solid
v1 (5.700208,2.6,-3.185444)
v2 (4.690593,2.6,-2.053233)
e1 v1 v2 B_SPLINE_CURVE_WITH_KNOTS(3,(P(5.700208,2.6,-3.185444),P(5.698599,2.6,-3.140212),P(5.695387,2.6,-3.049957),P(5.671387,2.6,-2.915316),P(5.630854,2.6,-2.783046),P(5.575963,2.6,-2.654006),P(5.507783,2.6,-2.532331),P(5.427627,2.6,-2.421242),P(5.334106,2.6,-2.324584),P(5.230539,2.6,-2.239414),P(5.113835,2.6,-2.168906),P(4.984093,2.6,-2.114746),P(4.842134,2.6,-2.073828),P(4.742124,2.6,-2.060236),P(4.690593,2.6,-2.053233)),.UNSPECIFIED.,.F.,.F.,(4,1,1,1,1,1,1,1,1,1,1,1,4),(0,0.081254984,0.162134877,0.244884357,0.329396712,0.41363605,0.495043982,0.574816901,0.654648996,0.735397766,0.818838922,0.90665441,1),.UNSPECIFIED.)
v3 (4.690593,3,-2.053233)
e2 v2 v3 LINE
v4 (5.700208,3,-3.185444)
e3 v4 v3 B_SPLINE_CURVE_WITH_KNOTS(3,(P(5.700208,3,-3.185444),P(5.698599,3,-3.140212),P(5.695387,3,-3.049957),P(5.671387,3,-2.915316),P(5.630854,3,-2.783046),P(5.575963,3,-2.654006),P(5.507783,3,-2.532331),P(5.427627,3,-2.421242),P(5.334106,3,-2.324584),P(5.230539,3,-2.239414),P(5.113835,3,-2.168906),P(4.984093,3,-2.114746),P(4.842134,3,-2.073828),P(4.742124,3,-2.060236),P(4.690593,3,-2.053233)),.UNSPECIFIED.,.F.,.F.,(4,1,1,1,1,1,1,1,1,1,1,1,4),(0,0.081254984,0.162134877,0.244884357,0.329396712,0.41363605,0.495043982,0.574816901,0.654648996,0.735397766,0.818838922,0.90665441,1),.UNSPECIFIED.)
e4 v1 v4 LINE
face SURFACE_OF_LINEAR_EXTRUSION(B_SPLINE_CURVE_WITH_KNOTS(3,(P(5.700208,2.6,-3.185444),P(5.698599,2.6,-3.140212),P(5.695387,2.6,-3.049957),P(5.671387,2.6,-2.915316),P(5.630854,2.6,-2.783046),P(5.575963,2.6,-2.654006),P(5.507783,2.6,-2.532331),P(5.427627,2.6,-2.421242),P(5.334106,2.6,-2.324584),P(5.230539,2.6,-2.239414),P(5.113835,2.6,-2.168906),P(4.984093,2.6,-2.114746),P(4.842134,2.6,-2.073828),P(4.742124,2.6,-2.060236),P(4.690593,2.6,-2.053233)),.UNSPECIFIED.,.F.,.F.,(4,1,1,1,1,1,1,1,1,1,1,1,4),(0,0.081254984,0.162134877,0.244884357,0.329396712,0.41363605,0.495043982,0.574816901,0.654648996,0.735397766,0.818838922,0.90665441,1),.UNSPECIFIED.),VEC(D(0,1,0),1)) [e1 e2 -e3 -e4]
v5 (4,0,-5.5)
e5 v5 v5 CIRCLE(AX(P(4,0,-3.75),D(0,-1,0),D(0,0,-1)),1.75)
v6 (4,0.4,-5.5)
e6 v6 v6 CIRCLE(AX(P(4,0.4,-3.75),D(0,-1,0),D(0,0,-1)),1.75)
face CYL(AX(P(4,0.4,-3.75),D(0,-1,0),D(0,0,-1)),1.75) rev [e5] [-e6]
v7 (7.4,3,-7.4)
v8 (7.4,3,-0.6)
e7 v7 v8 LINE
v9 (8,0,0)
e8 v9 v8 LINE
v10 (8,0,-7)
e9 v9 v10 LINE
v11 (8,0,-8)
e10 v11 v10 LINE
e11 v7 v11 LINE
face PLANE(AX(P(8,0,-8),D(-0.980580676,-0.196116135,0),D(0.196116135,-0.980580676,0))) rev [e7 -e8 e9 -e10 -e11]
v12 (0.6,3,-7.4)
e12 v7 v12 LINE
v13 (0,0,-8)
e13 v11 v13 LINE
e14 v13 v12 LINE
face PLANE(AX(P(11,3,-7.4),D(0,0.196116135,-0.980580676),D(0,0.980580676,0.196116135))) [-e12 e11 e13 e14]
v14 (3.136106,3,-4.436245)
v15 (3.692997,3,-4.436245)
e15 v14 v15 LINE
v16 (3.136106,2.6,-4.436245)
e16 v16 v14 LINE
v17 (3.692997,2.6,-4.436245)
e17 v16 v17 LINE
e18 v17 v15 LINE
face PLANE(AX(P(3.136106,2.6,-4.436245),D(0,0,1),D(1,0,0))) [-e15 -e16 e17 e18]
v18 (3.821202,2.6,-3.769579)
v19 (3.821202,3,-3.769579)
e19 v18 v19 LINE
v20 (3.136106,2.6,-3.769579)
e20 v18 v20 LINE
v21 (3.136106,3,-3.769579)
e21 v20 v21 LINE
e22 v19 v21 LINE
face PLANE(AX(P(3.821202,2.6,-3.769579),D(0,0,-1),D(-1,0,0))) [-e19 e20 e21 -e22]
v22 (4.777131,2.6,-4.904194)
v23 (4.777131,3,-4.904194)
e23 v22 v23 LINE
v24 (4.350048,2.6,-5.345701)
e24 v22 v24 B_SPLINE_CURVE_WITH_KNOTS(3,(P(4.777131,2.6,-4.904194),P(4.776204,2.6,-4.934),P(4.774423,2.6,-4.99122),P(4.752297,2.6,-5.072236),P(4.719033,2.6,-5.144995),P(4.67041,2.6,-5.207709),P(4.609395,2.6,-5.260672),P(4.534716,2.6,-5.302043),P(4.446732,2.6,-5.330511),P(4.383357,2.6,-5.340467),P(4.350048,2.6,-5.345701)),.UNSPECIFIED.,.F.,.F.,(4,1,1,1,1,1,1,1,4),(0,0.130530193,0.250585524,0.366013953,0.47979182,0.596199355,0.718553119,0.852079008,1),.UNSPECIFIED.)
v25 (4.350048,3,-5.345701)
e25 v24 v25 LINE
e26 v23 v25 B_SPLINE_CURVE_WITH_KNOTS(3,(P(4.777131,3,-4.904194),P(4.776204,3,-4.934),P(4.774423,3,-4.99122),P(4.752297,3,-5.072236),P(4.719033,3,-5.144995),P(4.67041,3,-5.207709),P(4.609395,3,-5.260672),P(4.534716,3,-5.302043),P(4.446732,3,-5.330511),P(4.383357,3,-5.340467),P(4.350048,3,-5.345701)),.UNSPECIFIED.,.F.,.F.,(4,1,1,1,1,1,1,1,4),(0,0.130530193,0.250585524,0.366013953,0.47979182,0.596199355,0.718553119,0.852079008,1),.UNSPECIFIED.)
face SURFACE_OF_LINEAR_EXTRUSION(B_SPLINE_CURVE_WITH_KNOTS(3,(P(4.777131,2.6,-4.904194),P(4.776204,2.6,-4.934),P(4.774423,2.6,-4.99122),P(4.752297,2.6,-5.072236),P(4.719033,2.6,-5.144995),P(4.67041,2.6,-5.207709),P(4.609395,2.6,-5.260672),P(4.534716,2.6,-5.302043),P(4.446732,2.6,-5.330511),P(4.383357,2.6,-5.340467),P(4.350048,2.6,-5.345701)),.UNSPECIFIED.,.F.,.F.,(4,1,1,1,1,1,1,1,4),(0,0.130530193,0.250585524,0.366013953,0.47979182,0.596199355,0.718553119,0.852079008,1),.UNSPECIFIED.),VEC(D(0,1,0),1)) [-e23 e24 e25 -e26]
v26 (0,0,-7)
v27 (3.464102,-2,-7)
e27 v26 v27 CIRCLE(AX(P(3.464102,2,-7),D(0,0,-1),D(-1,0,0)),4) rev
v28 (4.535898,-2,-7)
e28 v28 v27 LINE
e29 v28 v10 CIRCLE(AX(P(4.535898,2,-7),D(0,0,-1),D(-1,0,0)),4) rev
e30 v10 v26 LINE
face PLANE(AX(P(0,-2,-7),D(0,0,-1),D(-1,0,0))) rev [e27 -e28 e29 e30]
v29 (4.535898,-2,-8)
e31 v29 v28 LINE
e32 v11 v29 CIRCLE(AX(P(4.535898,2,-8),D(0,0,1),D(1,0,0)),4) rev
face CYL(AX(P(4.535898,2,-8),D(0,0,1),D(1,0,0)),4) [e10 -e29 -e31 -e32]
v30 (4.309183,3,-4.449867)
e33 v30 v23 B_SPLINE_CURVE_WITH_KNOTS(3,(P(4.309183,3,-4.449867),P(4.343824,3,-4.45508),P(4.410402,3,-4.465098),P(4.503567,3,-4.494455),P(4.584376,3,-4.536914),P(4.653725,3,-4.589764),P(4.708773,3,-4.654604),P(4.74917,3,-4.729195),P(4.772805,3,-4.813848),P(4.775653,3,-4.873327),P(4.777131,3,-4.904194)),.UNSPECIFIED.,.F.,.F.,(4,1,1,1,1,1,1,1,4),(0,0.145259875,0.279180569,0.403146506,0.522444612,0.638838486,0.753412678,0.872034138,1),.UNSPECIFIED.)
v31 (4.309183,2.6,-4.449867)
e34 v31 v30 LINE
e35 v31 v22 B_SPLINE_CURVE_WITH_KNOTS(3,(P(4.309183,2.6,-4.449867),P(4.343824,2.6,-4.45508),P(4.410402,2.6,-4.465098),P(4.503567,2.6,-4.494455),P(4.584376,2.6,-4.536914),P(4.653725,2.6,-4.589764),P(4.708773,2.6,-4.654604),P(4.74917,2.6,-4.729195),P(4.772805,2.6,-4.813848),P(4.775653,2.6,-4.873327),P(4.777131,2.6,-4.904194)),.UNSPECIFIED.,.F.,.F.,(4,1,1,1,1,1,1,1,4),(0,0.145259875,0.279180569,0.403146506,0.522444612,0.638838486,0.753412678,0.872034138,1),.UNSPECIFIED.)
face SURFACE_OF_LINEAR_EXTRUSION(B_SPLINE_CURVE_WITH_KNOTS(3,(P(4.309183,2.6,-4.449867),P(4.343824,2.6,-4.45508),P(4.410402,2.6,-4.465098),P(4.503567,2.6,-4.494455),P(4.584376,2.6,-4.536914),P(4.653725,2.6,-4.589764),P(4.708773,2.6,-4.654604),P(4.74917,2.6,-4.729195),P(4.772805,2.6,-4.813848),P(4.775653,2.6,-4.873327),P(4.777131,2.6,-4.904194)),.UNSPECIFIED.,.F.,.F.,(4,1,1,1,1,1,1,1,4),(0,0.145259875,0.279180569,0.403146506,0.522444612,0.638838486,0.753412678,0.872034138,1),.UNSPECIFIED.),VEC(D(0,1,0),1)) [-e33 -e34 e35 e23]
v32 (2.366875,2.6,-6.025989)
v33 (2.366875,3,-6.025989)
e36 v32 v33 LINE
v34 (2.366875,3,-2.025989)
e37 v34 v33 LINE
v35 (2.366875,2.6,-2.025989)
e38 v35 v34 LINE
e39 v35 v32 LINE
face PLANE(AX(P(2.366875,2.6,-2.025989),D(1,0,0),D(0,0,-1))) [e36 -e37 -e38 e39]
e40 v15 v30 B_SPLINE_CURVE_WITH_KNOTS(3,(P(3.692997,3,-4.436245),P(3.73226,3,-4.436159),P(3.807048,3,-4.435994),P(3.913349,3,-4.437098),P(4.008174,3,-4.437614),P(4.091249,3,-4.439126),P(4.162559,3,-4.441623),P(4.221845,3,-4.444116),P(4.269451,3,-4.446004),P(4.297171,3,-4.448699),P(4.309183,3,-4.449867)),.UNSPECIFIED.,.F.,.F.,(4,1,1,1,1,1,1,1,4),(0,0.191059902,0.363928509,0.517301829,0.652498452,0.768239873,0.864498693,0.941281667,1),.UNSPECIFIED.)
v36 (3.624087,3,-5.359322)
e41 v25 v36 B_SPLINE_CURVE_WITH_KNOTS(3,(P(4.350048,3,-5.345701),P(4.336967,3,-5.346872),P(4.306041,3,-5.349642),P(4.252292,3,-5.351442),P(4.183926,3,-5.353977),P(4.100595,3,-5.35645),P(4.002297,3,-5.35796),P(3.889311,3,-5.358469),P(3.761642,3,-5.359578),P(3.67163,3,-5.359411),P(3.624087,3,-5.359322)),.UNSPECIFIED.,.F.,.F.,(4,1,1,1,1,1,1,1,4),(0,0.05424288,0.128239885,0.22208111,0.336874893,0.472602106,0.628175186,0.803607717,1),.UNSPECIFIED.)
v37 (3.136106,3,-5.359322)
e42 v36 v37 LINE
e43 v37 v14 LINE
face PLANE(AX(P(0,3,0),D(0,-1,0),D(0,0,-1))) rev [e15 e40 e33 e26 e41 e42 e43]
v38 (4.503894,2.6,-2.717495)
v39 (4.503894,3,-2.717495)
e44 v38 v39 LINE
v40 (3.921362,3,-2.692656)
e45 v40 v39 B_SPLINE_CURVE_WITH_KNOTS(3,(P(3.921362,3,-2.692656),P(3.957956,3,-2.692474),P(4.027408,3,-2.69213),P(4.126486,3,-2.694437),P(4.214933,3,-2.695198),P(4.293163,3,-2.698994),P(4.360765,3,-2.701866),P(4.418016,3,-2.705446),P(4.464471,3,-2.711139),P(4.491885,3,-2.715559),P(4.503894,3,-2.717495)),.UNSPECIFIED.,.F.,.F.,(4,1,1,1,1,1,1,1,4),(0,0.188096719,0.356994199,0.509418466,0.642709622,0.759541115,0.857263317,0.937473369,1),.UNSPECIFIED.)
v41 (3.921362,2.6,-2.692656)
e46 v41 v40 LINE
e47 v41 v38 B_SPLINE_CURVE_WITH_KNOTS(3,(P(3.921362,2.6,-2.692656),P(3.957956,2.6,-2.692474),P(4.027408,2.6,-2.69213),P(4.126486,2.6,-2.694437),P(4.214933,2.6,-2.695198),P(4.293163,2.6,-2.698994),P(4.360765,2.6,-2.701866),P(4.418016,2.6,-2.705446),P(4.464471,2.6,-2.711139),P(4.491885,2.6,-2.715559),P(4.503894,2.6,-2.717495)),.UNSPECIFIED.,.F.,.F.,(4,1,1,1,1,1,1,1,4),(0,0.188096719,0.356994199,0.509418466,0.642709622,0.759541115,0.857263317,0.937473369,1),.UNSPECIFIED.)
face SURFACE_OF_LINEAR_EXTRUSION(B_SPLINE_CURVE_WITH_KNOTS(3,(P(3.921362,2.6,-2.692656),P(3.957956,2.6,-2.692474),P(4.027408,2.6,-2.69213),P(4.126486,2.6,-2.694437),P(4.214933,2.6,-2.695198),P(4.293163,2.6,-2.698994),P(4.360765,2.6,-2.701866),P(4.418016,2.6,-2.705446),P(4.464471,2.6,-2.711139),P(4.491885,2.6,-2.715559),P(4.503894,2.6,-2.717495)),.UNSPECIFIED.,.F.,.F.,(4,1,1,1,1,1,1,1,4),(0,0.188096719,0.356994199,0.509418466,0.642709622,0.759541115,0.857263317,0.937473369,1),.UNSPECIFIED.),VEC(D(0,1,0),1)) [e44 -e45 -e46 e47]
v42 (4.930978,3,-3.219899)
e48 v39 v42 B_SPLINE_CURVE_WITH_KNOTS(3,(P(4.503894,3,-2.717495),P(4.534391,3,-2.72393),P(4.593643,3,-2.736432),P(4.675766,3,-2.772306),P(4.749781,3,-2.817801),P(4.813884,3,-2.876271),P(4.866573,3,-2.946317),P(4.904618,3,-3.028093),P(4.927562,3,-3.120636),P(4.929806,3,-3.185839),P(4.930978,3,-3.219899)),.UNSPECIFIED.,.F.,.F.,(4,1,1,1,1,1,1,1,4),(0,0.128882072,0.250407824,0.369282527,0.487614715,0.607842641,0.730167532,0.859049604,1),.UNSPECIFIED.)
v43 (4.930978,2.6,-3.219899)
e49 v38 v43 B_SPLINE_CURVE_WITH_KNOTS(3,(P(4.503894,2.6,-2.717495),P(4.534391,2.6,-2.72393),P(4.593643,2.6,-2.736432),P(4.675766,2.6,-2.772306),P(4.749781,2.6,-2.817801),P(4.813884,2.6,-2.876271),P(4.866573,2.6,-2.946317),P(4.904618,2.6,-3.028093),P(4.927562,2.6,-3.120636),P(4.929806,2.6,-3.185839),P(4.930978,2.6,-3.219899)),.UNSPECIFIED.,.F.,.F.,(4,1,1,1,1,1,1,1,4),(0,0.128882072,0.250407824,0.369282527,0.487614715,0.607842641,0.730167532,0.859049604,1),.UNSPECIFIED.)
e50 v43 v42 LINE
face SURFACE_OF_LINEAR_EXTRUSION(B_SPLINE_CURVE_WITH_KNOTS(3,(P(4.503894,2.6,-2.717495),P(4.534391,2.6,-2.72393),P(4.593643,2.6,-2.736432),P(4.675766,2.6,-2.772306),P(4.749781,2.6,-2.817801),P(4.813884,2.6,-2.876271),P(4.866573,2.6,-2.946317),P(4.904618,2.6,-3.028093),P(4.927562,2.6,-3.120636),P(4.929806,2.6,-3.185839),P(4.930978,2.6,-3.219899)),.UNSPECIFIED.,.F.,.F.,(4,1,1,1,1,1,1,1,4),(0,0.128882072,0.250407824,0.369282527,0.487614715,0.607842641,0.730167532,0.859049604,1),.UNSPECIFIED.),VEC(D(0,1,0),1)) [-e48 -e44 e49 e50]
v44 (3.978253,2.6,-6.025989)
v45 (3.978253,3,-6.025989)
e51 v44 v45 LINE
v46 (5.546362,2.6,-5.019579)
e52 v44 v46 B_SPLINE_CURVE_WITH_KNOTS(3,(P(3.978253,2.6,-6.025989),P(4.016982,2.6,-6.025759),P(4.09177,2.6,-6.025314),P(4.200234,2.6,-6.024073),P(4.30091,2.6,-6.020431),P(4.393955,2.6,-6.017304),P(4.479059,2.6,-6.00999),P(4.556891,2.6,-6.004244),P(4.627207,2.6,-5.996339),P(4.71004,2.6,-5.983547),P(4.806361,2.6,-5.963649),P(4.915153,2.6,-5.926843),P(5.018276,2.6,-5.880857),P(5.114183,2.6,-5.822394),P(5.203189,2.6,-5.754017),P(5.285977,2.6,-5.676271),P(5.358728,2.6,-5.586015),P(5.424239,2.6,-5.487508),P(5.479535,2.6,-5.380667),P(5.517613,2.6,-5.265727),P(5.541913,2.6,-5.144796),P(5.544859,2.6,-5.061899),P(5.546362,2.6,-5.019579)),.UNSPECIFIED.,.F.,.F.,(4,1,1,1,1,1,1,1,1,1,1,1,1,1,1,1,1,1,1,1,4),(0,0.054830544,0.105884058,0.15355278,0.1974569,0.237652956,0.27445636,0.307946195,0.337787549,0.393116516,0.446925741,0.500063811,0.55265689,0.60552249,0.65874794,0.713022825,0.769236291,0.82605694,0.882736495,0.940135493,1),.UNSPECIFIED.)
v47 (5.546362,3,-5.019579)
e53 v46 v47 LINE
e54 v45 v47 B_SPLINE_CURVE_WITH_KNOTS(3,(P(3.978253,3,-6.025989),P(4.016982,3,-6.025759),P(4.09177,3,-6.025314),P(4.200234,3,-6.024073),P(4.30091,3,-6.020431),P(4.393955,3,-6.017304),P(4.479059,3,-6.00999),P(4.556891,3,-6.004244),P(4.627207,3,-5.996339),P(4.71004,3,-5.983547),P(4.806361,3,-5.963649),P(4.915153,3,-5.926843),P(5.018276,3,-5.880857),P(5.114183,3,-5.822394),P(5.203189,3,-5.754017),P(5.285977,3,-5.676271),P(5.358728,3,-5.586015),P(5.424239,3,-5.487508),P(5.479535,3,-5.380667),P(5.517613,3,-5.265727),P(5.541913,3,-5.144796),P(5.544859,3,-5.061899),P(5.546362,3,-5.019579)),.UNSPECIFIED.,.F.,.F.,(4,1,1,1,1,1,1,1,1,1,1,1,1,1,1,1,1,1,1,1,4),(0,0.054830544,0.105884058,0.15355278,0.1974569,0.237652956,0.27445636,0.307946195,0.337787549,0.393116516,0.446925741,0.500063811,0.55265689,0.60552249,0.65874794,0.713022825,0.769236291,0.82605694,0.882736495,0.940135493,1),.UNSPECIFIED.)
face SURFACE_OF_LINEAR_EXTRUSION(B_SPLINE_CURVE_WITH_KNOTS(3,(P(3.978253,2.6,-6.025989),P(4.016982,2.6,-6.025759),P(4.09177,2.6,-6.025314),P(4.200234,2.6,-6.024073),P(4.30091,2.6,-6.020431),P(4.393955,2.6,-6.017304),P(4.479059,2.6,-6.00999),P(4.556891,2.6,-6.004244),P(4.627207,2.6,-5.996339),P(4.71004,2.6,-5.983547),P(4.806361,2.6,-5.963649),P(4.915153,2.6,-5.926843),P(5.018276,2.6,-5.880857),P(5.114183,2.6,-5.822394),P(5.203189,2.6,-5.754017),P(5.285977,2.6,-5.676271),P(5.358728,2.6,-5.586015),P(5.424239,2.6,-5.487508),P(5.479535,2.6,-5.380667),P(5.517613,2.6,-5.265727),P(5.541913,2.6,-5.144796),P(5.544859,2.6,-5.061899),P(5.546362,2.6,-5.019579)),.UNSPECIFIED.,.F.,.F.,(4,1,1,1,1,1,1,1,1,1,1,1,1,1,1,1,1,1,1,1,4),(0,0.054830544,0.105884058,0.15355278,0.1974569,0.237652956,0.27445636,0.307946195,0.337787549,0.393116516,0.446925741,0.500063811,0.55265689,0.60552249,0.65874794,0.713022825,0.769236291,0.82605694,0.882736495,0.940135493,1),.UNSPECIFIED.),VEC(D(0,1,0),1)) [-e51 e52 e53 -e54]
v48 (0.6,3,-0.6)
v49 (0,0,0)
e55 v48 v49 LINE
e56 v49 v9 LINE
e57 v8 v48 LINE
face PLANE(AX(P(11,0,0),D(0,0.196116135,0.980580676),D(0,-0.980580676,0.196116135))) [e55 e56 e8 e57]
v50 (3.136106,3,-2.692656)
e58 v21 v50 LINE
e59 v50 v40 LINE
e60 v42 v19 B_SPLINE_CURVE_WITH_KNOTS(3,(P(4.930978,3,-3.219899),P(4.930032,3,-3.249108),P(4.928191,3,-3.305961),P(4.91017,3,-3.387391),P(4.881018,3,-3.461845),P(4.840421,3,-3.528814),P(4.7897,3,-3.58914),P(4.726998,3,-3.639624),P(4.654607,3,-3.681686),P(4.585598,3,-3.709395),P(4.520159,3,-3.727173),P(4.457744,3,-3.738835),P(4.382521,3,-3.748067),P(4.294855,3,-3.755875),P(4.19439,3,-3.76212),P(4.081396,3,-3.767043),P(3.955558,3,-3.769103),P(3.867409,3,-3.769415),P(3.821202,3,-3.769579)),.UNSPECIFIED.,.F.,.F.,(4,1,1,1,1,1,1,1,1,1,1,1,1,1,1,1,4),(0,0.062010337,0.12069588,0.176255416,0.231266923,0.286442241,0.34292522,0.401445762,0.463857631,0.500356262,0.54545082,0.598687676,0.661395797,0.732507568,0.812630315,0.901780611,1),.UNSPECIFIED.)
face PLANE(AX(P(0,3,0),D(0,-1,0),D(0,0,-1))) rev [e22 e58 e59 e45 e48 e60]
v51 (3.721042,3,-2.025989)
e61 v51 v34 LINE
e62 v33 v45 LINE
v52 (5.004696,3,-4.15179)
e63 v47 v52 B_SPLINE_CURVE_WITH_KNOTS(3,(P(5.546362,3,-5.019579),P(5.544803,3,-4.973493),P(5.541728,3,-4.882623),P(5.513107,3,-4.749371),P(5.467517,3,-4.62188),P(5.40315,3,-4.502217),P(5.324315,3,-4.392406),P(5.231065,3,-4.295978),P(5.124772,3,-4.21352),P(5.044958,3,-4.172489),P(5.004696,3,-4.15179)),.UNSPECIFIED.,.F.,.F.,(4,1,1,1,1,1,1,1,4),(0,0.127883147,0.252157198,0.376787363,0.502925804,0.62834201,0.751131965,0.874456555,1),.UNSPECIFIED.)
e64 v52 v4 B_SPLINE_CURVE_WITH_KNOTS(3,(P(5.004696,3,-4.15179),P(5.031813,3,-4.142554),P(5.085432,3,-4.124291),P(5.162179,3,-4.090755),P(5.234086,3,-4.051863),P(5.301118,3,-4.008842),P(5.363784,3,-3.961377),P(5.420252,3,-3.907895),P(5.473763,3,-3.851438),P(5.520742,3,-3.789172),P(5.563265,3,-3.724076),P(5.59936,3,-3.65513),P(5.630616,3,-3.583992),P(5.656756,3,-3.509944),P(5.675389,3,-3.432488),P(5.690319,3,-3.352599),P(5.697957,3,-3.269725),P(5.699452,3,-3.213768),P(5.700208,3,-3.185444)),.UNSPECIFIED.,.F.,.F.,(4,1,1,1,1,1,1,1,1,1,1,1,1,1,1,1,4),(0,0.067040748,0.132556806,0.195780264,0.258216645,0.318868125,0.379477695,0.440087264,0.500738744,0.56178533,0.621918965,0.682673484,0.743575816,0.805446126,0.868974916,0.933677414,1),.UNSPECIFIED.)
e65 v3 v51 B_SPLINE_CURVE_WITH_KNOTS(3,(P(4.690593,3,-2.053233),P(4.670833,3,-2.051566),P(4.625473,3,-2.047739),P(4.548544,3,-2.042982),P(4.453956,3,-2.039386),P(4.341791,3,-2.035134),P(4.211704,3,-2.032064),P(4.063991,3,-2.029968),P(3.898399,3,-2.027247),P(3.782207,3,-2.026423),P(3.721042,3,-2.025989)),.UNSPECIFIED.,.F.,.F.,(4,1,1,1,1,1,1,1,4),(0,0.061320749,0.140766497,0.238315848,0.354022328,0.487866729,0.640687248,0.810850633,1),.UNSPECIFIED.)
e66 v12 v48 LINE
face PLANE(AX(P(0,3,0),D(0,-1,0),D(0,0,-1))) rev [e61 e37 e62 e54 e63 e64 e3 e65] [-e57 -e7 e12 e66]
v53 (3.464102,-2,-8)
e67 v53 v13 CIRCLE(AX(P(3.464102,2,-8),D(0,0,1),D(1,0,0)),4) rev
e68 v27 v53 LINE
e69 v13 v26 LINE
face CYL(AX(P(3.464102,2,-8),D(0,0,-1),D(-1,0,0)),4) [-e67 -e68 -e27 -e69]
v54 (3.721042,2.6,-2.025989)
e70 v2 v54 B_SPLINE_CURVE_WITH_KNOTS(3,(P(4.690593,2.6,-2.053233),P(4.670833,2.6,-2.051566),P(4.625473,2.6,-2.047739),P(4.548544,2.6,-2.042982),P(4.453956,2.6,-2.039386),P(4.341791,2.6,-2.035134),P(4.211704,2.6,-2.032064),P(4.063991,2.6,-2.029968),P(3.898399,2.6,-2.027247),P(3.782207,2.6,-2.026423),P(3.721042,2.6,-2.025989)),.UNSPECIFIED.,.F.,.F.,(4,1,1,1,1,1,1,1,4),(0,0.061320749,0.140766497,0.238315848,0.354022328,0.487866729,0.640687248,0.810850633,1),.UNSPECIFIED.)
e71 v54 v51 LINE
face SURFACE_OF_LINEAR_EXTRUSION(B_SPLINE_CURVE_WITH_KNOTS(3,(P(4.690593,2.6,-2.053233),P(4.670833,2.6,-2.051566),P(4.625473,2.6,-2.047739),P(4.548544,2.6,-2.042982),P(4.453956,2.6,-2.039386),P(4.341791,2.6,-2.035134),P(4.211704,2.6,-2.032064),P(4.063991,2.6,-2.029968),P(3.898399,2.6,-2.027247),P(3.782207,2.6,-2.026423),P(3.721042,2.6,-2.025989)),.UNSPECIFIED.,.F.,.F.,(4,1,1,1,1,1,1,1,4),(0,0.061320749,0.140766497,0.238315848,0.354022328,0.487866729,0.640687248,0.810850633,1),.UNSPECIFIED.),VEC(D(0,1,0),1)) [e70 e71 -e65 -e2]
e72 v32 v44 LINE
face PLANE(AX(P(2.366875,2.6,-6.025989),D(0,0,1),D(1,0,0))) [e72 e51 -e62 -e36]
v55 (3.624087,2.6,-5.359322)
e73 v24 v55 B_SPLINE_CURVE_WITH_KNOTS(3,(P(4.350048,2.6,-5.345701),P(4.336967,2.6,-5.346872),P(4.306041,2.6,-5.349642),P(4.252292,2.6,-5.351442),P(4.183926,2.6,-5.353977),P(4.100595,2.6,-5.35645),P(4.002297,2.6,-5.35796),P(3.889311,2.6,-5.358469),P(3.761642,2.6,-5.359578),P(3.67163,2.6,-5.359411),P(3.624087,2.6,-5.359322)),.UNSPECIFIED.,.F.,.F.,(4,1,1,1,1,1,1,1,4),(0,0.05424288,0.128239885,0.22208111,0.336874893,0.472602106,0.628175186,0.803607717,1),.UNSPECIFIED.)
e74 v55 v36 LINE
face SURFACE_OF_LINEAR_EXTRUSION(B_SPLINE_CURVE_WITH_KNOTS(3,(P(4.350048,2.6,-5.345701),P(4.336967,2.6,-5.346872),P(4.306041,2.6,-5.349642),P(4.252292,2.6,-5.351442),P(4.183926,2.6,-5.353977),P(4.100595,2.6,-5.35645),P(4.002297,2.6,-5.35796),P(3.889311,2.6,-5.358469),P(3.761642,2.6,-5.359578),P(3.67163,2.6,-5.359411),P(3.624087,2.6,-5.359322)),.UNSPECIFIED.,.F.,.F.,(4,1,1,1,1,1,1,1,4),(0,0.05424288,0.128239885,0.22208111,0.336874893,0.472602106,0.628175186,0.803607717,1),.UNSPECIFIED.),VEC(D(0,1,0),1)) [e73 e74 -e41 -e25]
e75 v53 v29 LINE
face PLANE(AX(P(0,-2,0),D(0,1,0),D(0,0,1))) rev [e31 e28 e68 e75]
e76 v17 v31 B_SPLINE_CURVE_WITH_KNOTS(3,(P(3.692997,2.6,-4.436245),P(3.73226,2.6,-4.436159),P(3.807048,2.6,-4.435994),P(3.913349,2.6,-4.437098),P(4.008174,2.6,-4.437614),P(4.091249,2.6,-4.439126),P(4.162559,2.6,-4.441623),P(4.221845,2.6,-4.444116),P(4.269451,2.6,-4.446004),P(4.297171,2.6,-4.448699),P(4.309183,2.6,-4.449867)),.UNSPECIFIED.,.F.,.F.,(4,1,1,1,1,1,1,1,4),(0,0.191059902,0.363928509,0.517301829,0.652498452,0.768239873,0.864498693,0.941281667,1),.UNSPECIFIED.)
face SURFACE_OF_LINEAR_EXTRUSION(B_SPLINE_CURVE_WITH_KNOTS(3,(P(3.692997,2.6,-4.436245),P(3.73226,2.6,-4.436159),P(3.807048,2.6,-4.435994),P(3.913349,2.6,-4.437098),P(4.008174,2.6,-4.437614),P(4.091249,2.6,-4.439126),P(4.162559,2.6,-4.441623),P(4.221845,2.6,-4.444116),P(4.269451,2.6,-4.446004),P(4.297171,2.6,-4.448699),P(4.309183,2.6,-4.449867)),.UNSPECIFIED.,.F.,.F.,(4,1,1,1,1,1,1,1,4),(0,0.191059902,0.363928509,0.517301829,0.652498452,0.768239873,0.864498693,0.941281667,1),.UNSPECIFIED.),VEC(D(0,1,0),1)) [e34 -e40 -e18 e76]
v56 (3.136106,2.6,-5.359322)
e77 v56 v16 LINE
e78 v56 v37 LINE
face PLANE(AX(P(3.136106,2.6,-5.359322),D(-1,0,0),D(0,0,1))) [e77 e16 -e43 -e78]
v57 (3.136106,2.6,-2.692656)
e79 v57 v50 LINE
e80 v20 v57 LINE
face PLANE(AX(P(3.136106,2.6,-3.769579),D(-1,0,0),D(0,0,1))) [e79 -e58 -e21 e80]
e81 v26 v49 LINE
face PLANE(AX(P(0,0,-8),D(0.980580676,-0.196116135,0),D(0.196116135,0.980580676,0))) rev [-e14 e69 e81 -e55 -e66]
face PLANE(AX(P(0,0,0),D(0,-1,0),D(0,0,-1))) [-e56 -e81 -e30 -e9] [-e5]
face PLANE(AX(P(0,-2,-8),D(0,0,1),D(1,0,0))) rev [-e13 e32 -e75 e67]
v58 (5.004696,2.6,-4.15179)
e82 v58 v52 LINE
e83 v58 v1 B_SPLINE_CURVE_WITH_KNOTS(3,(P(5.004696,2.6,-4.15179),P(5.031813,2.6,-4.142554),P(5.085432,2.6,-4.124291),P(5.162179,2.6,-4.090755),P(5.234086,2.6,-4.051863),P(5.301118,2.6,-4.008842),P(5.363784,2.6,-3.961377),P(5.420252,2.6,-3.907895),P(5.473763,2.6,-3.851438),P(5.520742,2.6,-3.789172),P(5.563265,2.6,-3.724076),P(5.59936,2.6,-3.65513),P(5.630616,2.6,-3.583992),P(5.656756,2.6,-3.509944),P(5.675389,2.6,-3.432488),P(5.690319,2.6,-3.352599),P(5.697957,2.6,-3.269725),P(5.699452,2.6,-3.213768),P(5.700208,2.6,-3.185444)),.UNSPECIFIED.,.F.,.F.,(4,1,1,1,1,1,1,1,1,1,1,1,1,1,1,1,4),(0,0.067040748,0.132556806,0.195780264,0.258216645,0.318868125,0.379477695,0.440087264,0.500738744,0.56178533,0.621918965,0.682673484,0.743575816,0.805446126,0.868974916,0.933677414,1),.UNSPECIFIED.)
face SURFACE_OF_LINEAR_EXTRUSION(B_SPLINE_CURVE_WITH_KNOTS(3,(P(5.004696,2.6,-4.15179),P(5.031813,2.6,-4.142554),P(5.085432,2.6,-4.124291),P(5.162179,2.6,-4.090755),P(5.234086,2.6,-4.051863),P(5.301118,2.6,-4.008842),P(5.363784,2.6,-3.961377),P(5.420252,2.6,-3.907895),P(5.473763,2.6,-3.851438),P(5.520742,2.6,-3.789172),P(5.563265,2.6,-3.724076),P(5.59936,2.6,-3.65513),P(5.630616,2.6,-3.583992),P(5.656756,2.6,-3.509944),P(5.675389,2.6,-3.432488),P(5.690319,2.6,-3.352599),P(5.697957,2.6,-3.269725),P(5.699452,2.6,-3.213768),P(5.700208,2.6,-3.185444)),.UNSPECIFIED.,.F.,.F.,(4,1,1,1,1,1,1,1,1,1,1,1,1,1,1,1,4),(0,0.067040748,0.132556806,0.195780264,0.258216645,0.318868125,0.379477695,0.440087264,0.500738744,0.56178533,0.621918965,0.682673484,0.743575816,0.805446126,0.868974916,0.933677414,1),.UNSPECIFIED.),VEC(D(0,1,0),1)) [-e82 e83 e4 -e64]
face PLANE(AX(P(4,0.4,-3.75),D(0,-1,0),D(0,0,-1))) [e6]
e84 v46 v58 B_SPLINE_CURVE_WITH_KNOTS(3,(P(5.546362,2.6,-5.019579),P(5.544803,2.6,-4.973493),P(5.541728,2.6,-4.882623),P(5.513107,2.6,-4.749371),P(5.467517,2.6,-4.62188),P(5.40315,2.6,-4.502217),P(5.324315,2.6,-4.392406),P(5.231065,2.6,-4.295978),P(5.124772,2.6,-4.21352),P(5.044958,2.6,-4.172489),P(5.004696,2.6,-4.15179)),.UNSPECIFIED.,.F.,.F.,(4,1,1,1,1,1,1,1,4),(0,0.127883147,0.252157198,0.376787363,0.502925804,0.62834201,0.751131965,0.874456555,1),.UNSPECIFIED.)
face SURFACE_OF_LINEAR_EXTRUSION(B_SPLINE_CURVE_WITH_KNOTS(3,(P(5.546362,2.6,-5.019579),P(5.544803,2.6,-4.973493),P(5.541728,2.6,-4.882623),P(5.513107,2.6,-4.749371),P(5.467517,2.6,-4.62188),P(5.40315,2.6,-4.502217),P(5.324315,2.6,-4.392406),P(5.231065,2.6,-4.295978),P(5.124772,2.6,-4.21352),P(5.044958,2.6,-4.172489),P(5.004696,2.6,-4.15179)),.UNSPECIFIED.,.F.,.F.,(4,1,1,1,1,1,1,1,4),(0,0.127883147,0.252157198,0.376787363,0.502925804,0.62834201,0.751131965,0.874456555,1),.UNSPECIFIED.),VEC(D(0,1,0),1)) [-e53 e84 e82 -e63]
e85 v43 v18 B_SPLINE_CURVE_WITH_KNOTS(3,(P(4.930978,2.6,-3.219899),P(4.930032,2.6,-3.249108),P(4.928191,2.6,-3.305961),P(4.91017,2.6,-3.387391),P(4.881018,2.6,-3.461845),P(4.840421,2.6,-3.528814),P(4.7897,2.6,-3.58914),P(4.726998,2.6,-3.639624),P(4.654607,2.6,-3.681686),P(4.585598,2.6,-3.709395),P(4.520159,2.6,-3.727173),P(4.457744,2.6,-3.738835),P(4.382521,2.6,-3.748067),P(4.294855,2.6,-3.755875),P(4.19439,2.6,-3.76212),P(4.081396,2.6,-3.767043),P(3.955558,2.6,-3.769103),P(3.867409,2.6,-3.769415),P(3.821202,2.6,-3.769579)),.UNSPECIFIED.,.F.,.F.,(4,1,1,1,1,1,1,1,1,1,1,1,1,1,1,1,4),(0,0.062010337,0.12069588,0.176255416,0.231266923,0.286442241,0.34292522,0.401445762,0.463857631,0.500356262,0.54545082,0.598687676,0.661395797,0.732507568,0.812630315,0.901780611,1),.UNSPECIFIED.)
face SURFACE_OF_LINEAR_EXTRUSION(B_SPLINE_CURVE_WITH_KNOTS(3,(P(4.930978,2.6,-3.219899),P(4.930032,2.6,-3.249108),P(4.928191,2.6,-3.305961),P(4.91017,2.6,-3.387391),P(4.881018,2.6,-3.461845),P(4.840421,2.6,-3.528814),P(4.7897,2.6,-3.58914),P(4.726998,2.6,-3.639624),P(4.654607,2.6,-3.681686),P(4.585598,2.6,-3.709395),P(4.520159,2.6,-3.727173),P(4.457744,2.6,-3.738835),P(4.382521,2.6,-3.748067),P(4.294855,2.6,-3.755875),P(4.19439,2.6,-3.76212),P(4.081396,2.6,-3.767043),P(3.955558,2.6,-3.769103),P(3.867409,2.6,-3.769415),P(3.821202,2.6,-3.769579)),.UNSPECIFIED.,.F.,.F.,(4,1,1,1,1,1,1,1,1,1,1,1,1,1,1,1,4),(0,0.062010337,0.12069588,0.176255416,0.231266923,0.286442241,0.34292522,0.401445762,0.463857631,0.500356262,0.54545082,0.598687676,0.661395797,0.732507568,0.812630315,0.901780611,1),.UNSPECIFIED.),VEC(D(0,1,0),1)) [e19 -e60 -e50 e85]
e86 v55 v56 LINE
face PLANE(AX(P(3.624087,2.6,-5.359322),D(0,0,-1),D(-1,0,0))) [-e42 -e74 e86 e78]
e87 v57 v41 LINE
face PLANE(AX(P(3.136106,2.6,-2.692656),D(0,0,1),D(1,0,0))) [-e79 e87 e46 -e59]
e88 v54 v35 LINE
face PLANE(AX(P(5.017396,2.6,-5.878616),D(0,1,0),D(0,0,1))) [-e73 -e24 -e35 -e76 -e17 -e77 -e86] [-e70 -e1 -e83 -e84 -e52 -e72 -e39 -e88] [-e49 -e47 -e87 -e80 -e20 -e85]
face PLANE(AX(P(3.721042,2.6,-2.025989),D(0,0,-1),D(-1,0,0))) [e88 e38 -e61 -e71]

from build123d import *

# Parameters (mm, degrees)
SKETCH1_W               = 8
SKETCH1_H               = 8
BOSS_EXTRUDE1_DEPTH     = 3
CUT_EXTRUDE1_DEPTH      = 12.704699911
CUT_EXTRUDE1_DEPTH_BACK = 12.704699911
CUT_EXTRUDE2_DEPTH      = 11
SKETCH4_R               = 1.75
CUT_EXTRUDE3_DEPTH      = 0.4
SKETCH5_W               = 8
SKETCH5_H               = 1
BOSS_EXTRUDE2_DEPTH     = 2
FILLET1_R               = 4
CUT_EXTRUDE4_DEPTH      = 0.4


with BuildPart() as part:
    # Sketch1 → Boss-Extrude1 (new body)
    with BuildSketch(Plane(origin=(0, 0, 0), x_dir=(1, 0, 0), z_dir=(0, 1, 0))):
        with Locations((4, 4)):
            Rectangle(SKETCH1_W, SKETCH1_H)
    extrude(amount=BOSS_EXTRUDE1_DEPTH)

    # Sketch2 → Cut-Extrude1 (cut, two sides: drawn at the far end of the back side and taken through both)
    with BuildSketch(Plane.XY.offset(-CUT_EXTRUDE1_DEPTH_BACK)):
        Polygon((0, 0), (0.6, 3), (0, 3), align=None)
        Polygon((8, 0), (7.4, 3), (8, 3), align=None)
    extrude(amount=CUT_EXTRUDE1_DEPTH + CUT_EXTRUDE1_DEPTH_BACK, mode=Mode.SUBTRACT)

    # Sketch3 → Cut-Extrude2 (cut)
    with BuildSketch(Plane(origin=(0, 0, 0), x_dir=(0, 0, -1), z_dir=(1, 0, 0))):
        Polygon((0, 0), (0.6, 3), (0, 3), align=None)
        Polygon((8, 3), (7.4, 3), (8, 0), align=None)
    extrude(amount=CUT_EXTRUDE2_DEPTH, mode=Mode.SUBTRACT)

    # Sketch4 → Cut-Extrude3 (cut)
    with BuildSketch(Plane.XZ):
        with Locations(Location((4, -3.75, 0), (0, 0, 270))):
            Circle(SKETCH4_R)
    extrude(amount=-CUT_EXTRUDE3_DEPTH, mode=Mode.SUBTRACT)

    # Sketch5 → Boss-Extrude2 (add)
    with BuildSketch(Plane.XZ):
        with Locations((4, -7.5)):
            Rectangle(SKETCH5_W, SKETCH5_H)
    extrude(amount=BOSS_EXTRUDE2_DEPTH)

    # Fillet1
    # the kernel refuses this fillet: 4 mm, written as the material it takes off along each edge
    with BuildSketch(Plane(origin=(8, -2, -16.660254038), x_dir=(0, 1, 0), z_dir=(0, 0, 1)), Plane(origin=(0, -2, 1.660254038), x_dir=(0, 1, 0), z_dir=(0, 0, -1))) as fillet1_piece_1:
        with BuildLine():
            CenterArc((4, 3.464101615), FILLET1_R, 180, 60)
            Line((0, 3.464101615), (-0.08, 3.464101615))
            Line((-0.08, 3.464101615), (-0.08, 0))
            Line((-0.08, 0), (0, -0.08))
            ThreePointArc((0, -0.08), (1, -0.08), (1.96, -0.069282032))
            Line((1.96, -0.069282032), (2, 0))
        make_face()
    extrude(amount=18.320508076, mode=Mode.SUBTRACT)

    # Sketch6 → Cut-Extrude4 (cut)
    with BuildSketch(Plane(origin=(0, 3, 0), x_dir=(1, 0, 0), z_dir=(0, 1, 0))):
        with BuildLine():
            Line((2.366875023, 6.025988971), (3.978253228, 6.025988971))
            add(Edge.make_bspline(
                [(3.978253228, 6.025988971), (4.016981522, 6.025758539), (4.091770291, 6.025313549), (4.200234262, 6.02407341), (4.300910244, 6.020431423), (4.393955008, 6.01730407), (4.479059098, 6.009990491), (4.556891378, 6.004244483), (4.627206795, 5.996339471), (4.710040188, 5.983546816), (4.806360793, 5.963648743), (4.915152558, 5.926842691), (5.018276483, 5.880857129), (5.114182519, 5.822393524), (5.203189243, 5.754016663), (5.28597738, 5.676271174), (5.358728101, 5.58601543), (5.424238976, 5.487508268), (5.479534837, 5.380666952), (5.517612886, 5.26572697), (5.541913225, 5.144795761), (5.544858568, 5.061898711), (5.546362202, 5.019578715)],
                knots=[0, 0, 0, 0, 1.096610875, 2.117681168, 3.071055591, 3.949137991, 4.753059115, 5.489127199, 6.15892391, 6.75575099, 7.862330316, 8.938514814, 10.001276227, 11.05313779, 12.110449801, 13.174958802, 14.260456508, 15.384725817, 16.521138801, 17.654729897, 18.802709851, 20, 20, 20, 20], degree=3))
            add(Edge.make_bspline(
                [(5.546362202, 5.019578715), (5.544802721, 4.973493311), (5.541727769, 4.882623117), (5.513106772, 4.749371009), (5.467516851, 4.621879661), (5.40315043, 4.502217288), (5.324314646, 4.392405777), (5.231065087, 4.295977947), (5.12477188, 4.213520097), (5.044958184, 4.17248881), (5.004695536, 4.151790253)],
                knots=[0, 0, 0, 0, 1.023065178, 2.01725758, 3.014298905, 4.023406433, 5.026736079, 6.009055718, 6.99565244, 8, 8, 8, 8], degree=3))
            add(Edge.make_bspline(
                [(5.004695536, 4.151790253), (5.0318132, 4.142553707), (5.085431798, 4.12429068), (5.162178571, 4.090754541), (5.234086142, 4.051862796), (5.301118401, 4.008841827), (5.363784101, 3.961377137), (5.420252395, 3.907894911), (5.473763466, 3.851437899), (5.520742036, 3.789172127), (5.563264851, 3.724075672), (5.599360366, 3.65512964), (5.630616076, 3.583992364), (5.656755805, 3.509943884), (5.675388869, 3.432487562), (5.69031884, 3.352599145), (5.697956597, 3.269724954), (5.699451608, 3.213768347), (5.700208356, 3.185444099)],
                knots=[0, 0, 0, 0, 1.072651974, 2.1209089, 3.132484228, 4.131466326, 5.101889999, 6.071643115, 7.041396231, 8.011819904, 8.988565287, 9.95070344, 10.922775742, 11.897213062, 12.887138018, 13.903598663, 14.938838629, 16, 16, 16, 16], degree=3))
            add(Edge.make_bspline(
                [(5.700208356, 3.185444099), (5.698598844, 3.140212221), (5.695387249, 3.049957264), (5.671387404, 2.915316113), (5.630853991, 2.783046233), (5.575963383, 2.654005704), (5.507783193, 2.532330941), (5.427626978, 2.4212421), (5.334105775, 2.324584109), (5.230539132, 2.239414342), (5.113835126, 2.16890592), (4.984093466, 2.114745557), (4.842134035, 2.073828468), (4.742124288, 2.060236169), (4.690592972, 2.053232561)],
                knots=[0, 0, 0, 0, 0.975059807, 1.945618526, 2.93861228, 3.952760547, 4.963632603, 5.940527786, 6.897802811, 7.855787948, 8.824773195, 9.82606706, 10.879852914, 12, 12, 12, 12], degree=3))
            add(Edge.make_bspline(
                [(4.690592972, 2.053232561), (4.670833027, 2.051565703), (4.625472552, 2.047739302), (4.548543711, 2.042982046), (4.453955886, 2.039386091), (4.341791209, 2.035134329), (4.211704387, 2.032064432), (4.063991072, 2.029968108), (3.898399223, 2.027247493), (3.782207382, 2.026423), (3.72104169, 2.025988971)],
                knots=[0, 0, 0, 0, 0.490565993, 1.126131979, 1.906526787, 2.832178623, 3.902933831, 5.125497984, 6.486805064, 8, 8, 8, 8], degree=3))
            Line((3.72104169, 2.025988971), (2.366875023, 2.025988971))
            Line((2.366875023, 2.025988971), (2.366875023, 6.025988971))
        make_face()
        with BuildLine():
            Line((3.136105792, 5.359322304), (3.136105792, 4.436245381))
            Line((3.136105792, 4.436245381), (3.692996818, 4.436245381))
            add(Edge.make_bspline(
                [(3.692996818, 4.436245381), (3.732259986, 4.43615888), (3.807047978, 4.435994114), (3.91334909, 4.43709824), (4.008173732, 4.437613694), (4.091249283, 4.439126475), (4.162558686, 4.441623123), (4.221845003, 4.444116229), (4.269450826, 4.446003799), (4.297170592, 4.448699163), (4.309182715, 4.449867176)],
                knots=[0, 0, 0, 0, 1.528479216, 2.911428072, 4.138414629, 5.21998762, 6.145918986, 6.915989543, 7.530253335, 8, 8, 8, 8], degree=3))
            add(Edge.make_bspline(
                [(4.309182715, 4.449867176), (4.3438238, 4.455079871), (4.41040184, 4.465098351), (4.503567155, 4.494454854), (4.584375726, 4.536913614), (4.653724553, 4.58976356), (4.708773054, 4.654604252), (4.749170144, 4.72919452), (4.772805412, 4.813847791), (4.775653451, 4.873327339), (4.777131433, 4.904194099)],
                knots=[0, 0, 0, 0, 1.162079002, 2.233444551, 3.225172046, 4.179556897, 5.110707885, 6.027301426, 6.976273101, 8, 8, 8, 8], degree=3))
            add(Edge.make_bspline(
                [(4.777131433, 4.904194099), (4.776203651, 4.934000177), (4.774422539, 4.991220438), (4.752297006, 5.072236392), (4.719032932, 5.144995211), (4.670409719, 5.207709385), (4.609395094, 5.260672186), (4.534716376, 5.302043411), (4.446732173, 5.330510733), (4.38335661, 5.340467498), (4.3500481, 5.345700509)],
                knots=[0, 0, 0, 0, 1.044241546, 2.004684189, 2.928111627, 3.838334562, 4.769594837, 5.748424953, 6.81663206, 8, 8, 8, 8], degree=3))
            add(Edge.make_bspline(
                [(4.3500481, 5.345700509), (4.336967148, 5.34687206), (4.306041436, 5.349641817), (4.252292165, 5.35144236), (4.183926257, 5.353976507), (4.100595234, 5.356449705), (4.002296842, 5.357959731), (3.889310645, 5.358468661), (3.761641688, 5.359577608), (3.671629596, 5.359410545), (3.624086561, 5.359322304)],
                knots=[0, 0, 0, 0, 0.433943041, 1.02591908, 1.776648879, 2.694999143, 3.780816848, 5.02540149, 6.428861738, 8, 8, 8, 8], degree=3))
            Line((3.624086561, 5.359322304), (3.136105792, 5.359322304))
        make_face(mode=Mode.SUBTRACT)
        with BuildLine():
            Line((3.136105792, 3.769578715), (3.136105792, 2.692655638))
            Line((3.136105792, 2.692655638), (3.921362202, 2.692655638))
            add(Edge.make_bspline(
                [(3.921362202, 2.692655638), (3.957955896, 2.692474114), (4.027408125, 2.692129595), (4.126486109, 2.694437139), (4.214933064, 2.69519802), (4.293162962, 2.698994102), (4.360764719, 2.701865798), (4.418016495, 2.705445849), (4.464471269, 2.711139165), (4.491885355, 2.715559172), (4.503894254, 2.717495381)],
                knots=[0, 0, 0, 0, 1.504773752, 2.85595359, 4.075347731, 5.141676974, 6.076328919, 6.858106537, 7.499786952, 8, 8, 8, 8], degree=3))
            add(Edge.make_bspline(
                [(4.503894254, 2.717495381), (4.534390702, 2.723929926), (4.593642924, 2.736431746), (4.675765739, 2.772305806), (4.749780788, 2.817800627), (4.813883543, 2.876271003), (4.866572685, 2.946316906), (4.904617992, 3.02809262), (4.927561873, 3.120636015), (4.929805566, 3.185839411), (4.930977587, 3.219899227)],
                knots=[0, 0, 0, 0, 1.031056579, 2.003262591, 2.954260215, 3.900917722, 4.862741126, 5.841340256, 6.872396835, 8, 8, 8, 8], degree=3))
            add(Edge.make_bspline(
                [(4.930977587, 3.219899227), (4.930031736, 3.249108452), (4.928190747, 3.305960799), (4.910169932, 3.38739087), (4.88101832, 3.461844609), (4.840421058, 3.528813936), (4.789699747, 3.589139928), (4.726998003, 3.639624345), (4.654607383, 3.681685756), (4.585597801, 3.709395341), (4.520158829, 3.72717269), (4.457743787, 3.73883498), (4.382520906, 3.748066566), (4.294854864, 3.755875466), (4.194389919, 3.762120128), (4.081396073, 3.767043008), (3.95555801, 3.769103428), (3.867409493, 3.769415255), (3.821201946, 3.769578715)],
                knots=[0, 0, 0, 0, 0.992165387, 1.931134082, 2.820086661, 3.700270762, 4.583075858, 5.486803518, 6.423132184, 7.421722103, 8.005700193, 8.727213115, 9.57900282, 10.582332745, 11.720121093, 13.002085041, 14.428489784, 16, 16, 16, 16], degree=3))
            Line((3.821201946, 3.769578715), (3.136105792, 3.769578715))
        make_face(mode=Mode.SUBTRACT)
    extrude(amount=-CUT_EXTRUDE4_DEPTH, mode=Mode.SUBTRACT)


solid = part.part
